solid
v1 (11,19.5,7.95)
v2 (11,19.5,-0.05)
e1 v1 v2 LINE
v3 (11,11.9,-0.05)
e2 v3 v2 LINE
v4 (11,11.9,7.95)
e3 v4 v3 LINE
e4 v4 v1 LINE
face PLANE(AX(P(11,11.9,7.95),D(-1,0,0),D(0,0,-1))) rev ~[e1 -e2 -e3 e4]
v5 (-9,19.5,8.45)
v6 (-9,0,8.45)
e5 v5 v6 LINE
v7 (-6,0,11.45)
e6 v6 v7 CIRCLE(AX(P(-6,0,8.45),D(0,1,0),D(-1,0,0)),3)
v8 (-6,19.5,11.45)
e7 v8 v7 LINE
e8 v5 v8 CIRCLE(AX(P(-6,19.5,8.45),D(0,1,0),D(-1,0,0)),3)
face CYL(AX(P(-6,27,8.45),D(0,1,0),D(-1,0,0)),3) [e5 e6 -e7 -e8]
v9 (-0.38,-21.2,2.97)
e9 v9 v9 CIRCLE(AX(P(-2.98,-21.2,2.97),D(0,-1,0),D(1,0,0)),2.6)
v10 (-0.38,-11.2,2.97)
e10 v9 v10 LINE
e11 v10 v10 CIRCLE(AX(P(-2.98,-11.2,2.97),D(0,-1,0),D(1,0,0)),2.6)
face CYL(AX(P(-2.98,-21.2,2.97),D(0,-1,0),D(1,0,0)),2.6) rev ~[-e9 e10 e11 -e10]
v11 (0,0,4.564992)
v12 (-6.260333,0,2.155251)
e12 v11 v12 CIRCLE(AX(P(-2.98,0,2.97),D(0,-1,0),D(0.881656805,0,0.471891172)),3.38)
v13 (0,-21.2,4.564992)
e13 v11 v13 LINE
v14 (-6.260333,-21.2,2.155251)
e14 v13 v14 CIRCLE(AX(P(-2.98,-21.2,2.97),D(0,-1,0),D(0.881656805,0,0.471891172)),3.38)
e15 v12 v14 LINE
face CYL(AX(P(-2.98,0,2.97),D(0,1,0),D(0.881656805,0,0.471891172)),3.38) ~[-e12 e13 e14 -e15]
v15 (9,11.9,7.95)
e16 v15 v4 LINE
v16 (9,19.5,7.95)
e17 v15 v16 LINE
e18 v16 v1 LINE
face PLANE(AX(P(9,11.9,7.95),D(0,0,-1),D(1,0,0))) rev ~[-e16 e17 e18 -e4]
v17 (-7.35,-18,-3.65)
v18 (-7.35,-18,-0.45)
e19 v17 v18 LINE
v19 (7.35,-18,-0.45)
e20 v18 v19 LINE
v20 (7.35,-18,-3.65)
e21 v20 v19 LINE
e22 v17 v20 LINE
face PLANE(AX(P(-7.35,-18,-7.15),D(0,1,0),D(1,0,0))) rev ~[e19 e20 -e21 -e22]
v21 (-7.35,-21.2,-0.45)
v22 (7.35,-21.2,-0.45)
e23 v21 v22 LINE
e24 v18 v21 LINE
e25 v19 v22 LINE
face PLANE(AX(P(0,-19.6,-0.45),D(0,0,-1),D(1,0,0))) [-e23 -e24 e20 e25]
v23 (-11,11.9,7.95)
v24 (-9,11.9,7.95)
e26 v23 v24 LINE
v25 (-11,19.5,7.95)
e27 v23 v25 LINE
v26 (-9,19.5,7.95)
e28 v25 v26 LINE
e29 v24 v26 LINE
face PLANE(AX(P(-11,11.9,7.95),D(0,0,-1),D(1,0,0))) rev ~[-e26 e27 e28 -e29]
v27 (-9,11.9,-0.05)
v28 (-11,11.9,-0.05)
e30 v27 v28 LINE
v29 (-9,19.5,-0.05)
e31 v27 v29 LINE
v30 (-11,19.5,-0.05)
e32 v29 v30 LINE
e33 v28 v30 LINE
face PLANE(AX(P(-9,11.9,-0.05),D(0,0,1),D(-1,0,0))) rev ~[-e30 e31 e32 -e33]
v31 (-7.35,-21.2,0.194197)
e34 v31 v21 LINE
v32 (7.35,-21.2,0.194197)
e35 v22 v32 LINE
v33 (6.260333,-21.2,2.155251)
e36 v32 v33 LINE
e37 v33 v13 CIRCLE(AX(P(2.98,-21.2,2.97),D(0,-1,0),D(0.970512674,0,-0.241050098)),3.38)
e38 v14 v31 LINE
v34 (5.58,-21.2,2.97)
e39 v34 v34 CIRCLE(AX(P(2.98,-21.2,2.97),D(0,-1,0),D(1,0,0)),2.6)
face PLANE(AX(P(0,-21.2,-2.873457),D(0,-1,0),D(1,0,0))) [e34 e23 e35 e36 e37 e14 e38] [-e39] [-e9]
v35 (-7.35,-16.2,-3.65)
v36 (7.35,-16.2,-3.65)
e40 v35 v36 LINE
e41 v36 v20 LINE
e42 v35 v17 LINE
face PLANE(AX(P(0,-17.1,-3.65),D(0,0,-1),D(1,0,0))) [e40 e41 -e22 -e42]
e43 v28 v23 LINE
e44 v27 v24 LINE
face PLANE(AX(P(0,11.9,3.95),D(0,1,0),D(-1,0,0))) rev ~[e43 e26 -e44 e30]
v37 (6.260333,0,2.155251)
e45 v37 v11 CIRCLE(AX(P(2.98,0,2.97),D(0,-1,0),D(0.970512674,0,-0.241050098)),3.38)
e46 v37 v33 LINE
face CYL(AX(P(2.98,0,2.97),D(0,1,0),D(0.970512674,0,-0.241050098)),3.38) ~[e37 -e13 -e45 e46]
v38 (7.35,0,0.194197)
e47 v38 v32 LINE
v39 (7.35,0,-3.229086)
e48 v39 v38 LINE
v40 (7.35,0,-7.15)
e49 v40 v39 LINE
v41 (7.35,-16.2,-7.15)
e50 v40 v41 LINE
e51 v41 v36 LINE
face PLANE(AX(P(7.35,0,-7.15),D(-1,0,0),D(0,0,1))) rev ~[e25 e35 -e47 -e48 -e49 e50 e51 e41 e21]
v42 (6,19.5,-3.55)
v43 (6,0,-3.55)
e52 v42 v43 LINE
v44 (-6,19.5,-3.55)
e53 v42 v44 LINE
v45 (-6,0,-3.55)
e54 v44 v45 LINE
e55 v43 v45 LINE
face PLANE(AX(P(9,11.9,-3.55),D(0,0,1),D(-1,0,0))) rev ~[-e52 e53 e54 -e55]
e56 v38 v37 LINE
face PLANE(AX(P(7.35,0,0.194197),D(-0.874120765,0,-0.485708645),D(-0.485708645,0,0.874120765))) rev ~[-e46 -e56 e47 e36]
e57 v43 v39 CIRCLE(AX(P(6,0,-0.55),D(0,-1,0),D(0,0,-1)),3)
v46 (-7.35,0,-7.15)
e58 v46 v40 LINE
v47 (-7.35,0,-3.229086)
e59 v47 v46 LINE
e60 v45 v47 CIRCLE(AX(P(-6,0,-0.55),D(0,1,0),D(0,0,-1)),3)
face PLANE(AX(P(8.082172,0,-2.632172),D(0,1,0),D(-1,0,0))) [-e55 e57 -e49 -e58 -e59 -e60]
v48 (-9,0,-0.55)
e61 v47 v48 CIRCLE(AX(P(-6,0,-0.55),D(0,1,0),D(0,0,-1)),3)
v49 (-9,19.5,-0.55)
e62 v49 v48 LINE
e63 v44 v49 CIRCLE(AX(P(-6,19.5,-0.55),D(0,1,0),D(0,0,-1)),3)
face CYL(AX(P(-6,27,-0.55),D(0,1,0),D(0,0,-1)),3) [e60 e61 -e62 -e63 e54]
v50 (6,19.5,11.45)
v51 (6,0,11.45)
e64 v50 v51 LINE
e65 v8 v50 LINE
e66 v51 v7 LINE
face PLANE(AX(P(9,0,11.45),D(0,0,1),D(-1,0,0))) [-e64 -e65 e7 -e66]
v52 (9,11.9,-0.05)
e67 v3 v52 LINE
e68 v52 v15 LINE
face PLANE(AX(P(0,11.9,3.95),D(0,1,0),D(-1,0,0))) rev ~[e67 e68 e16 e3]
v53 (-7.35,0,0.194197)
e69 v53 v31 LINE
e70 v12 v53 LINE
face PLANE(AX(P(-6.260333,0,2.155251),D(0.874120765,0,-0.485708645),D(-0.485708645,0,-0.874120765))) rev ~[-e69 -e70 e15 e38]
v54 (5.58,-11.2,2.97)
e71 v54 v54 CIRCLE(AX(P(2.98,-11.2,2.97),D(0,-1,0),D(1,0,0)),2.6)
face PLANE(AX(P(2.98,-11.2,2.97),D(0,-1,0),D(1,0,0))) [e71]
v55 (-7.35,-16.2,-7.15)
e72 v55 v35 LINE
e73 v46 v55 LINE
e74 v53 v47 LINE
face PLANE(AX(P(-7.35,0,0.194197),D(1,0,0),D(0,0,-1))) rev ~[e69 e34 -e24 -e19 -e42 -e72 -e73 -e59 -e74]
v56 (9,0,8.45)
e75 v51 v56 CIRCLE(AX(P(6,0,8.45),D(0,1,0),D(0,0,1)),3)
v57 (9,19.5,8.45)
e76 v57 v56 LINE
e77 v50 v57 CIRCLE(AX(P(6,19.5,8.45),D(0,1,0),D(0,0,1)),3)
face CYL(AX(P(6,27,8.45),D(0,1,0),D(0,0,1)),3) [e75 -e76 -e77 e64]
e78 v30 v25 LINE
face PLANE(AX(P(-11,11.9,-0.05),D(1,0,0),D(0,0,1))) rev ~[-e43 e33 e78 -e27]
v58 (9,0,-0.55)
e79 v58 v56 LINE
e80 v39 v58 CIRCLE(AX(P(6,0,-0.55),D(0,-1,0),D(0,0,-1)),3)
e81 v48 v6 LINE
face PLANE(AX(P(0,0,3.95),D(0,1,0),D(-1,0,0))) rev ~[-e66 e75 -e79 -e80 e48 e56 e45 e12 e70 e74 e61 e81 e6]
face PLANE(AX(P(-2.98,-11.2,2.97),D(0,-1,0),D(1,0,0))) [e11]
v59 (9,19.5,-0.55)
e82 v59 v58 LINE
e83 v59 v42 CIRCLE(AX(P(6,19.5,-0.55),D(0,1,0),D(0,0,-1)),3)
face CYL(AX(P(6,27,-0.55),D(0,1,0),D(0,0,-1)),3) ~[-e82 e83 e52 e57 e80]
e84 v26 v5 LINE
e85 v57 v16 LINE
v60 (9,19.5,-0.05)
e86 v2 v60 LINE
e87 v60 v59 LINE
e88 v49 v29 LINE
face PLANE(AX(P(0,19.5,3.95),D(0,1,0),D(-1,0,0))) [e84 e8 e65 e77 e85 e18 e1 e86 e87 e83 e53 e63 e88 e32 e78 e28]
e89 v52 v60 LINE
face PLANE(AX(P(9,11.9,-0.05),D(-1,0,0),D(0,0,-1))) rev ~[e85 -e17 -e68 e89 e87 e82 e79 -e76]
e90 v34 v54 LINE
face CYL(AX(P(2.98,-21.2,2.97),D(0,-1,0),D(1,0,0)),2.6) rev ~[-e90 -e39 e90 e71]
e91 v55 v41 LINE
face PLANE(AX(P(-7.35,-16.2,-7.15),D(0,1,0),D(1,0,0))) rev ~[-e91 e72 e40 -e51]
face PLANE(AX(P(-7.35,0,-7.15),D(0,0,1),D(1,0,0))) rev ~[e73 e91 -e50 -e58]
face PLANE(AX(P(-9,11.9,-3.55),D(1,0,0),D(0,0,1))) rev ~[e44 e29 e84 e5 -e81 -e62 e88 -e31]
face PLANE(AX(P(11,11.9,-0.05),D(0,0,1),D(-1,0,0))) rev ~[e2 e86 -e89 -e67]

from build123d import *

# Parameters (mm, degrees)
F1_DEPTH     = 21.2
F2_W         = 14.7
F2_H         = 3.2
F3_DEPTH     = 6.7
F4_R         = 2.6
F5_DEPTH     = 10
F6_W         = 18
F6_H         = 15
F7_DEPTH     = 11.9
F9_DEPTH     = 7.6
F10_T1_DEPTH = 34.5
F10_T3_DEPTH = 27
F11_W        = 14.7
F11_H        = 1.8
F12_DEPTH    = 3.5


# Not quite as in the source:
# - a fillet or chamfer that OpenCascade refuses, or shapes differently, is made with other operations: its cross-section is extruded or revolved along the edge and cut away or added


with BuildPart() as f1:
    # F0 (on Front) → F1 (new body)
    with BuildSketch(Plane.XZ):
        with BuildLine():
            Line((-7.35, 0.194197055), (-7.35, -7.15))
            Line((-7.35, -7.15), (7.35, -7.15))
            Line((7.35, -7.15), (7.35, 0.194197055))
            Line((7.35, 0.194197055), (6.2603328375, 2.1552506672))
            ThreePointArc((6.2603328375, 2.1552506672), (3.3980247264, -0.3840505852), (0, 1.375007837))
            ThreePointArc((0, 1.375007837), (-3.3980247264, -0.3840505852), (-6.2603328375, 2.1552506672))
            Line((-6.2603328375, 2.1552506672), (-7.35, 0.194197055))
        make_face()
        with BuildLine():
            ThreePointArc((0, 4.564992163), (-4.1941925187, 6.1243837001), (-6.2603328375, 2.1552506672))
            ThreePointArc((-6.2603328375, 2.1552506672), (-3.3980247264, -0.3840505852), (0, 1.375007837))
            ThreePointArc((0, 1.375007837), (3.3980247264, -0.3840505852), (6.2603328375, 2.1552506672))
            ThreePointArc((6.2603328375, 2.1552506672), (4.1941925187, 6.1243837001), (0, 4.564992163))
        make_face()
    extrude(amount=F1_DEPTH)

    # F2 (on face) → F3 (cut)
    with BuildSketch(Plane(origin=(0, 0, -7.15), x_dir=(1, 0, 0), z_dir=(0, 0, -1))):
        with Locations((0, 19.6)):
            Rectangle(F2_W, F2_H)
    extrude(amount=-F3_DEPTH, mode=Mode.SUBTRACT)

    # F4 (on face) → F5 (cut)
    with BuildSketch(Plane.XZ.offset(21.2)):
        with Locations((-2.98, 2.97)):
            Circle(F4_R)
        with Locations((2.98, 2.97)):
            Circle(F4_R)
    extrude(amount=-F5_DEPTH, mode=Mode.SUBTRACT)

    # F6 (on face) → F7 (join)
    with BuildSketch(Plane(origin=(0, 0, 0), x_dir=(-1, 0, 0), z_dir=(0, 1, 0))):
        with Locations((0, 3.95)):
            Rectangle(F6_W, F6_H)
    extrude(amount=F7_DEPTH)

    # F8 (on face) → F9 (join)
    with BuildSketch(Plane(origin=(0, 11.9, 0), x_dir=(-1, 0, 0), z_dir=(0, 1, 0))):
        Polygon((-9, -0.05), (-9, -3.55), (9, -3.55), (9, -0.05), (11, -0.05), (11, 7.95), (9, 7.95), (9, 11.45), (-9, 11.45), (-9, 7.95), (-11, 7.95), (-11, -0.05), align=None)
    extrude(amount=F9_DEPTH)

    # F10: fillet of radius 3 on 4 edges, made by hand

    # F10_s2 → F10_t1 (cut)
    with BuildSketch(Plane.XZ.offset(-27)):
        with BuildLine():
            ThreePointArc((6, 11.45), (8.1213203436, 10.5713203436), (9, 8.45))
            Line((9, 8.45), (9, 11.45))
            Line((9, 11.45), (6, 11.45))
        make_face()
        with BuildLine():
            ThreePointArc((-9, 8.45), (-8.1213203436, 10.5713203436), (-6, 11.45))
            Line((-6, 11.45), (-9, 11.45))
            Line((-9, 11.45), (-9, 8.45))
        make_face()
    extrude(amount=F10_T1_DEPTH, mode=Mode.SUBTRACT)

    # F10_s4 → F10_t3 (cut)
    with BuildSketch(Plane.XZ.offset(-27)):
        with BuildLine():
            ThreePointArc((6, -3.55), (8.1213203436, -2.6713203436), (9, -0.55))
            Line((9, -0.55), (9, -3.55))
            Line((9, -3.55), (6, -3.55))
        make_face()
        with BuildLine():
            ThreePointArc((-6, -3.55), (-8.1213203436, -2.6713203436), (-9, -0.55))
            Line((-9, -0.55), (-9, -3.55))
            Line((-9, -3.55), (-6, -3.55))
        make_face()
    extrude(amount=F10_T3_DEPTH, mode=Mode.SUBTRACT)

    # F11 (on face) → F12 (cut)
    with BuildSketch(Plane(origin=(0, 0, -7.15), x_dir=(1, 0, 0), z_dir=(0, 0, -1))):
        with Locations((0, 17.1)):
            Rectangle(F11_W, F11_H)
    extrude(amount=-F12_DEPTH, mode=Mode.SUBTRACT)


solid = f1.part
